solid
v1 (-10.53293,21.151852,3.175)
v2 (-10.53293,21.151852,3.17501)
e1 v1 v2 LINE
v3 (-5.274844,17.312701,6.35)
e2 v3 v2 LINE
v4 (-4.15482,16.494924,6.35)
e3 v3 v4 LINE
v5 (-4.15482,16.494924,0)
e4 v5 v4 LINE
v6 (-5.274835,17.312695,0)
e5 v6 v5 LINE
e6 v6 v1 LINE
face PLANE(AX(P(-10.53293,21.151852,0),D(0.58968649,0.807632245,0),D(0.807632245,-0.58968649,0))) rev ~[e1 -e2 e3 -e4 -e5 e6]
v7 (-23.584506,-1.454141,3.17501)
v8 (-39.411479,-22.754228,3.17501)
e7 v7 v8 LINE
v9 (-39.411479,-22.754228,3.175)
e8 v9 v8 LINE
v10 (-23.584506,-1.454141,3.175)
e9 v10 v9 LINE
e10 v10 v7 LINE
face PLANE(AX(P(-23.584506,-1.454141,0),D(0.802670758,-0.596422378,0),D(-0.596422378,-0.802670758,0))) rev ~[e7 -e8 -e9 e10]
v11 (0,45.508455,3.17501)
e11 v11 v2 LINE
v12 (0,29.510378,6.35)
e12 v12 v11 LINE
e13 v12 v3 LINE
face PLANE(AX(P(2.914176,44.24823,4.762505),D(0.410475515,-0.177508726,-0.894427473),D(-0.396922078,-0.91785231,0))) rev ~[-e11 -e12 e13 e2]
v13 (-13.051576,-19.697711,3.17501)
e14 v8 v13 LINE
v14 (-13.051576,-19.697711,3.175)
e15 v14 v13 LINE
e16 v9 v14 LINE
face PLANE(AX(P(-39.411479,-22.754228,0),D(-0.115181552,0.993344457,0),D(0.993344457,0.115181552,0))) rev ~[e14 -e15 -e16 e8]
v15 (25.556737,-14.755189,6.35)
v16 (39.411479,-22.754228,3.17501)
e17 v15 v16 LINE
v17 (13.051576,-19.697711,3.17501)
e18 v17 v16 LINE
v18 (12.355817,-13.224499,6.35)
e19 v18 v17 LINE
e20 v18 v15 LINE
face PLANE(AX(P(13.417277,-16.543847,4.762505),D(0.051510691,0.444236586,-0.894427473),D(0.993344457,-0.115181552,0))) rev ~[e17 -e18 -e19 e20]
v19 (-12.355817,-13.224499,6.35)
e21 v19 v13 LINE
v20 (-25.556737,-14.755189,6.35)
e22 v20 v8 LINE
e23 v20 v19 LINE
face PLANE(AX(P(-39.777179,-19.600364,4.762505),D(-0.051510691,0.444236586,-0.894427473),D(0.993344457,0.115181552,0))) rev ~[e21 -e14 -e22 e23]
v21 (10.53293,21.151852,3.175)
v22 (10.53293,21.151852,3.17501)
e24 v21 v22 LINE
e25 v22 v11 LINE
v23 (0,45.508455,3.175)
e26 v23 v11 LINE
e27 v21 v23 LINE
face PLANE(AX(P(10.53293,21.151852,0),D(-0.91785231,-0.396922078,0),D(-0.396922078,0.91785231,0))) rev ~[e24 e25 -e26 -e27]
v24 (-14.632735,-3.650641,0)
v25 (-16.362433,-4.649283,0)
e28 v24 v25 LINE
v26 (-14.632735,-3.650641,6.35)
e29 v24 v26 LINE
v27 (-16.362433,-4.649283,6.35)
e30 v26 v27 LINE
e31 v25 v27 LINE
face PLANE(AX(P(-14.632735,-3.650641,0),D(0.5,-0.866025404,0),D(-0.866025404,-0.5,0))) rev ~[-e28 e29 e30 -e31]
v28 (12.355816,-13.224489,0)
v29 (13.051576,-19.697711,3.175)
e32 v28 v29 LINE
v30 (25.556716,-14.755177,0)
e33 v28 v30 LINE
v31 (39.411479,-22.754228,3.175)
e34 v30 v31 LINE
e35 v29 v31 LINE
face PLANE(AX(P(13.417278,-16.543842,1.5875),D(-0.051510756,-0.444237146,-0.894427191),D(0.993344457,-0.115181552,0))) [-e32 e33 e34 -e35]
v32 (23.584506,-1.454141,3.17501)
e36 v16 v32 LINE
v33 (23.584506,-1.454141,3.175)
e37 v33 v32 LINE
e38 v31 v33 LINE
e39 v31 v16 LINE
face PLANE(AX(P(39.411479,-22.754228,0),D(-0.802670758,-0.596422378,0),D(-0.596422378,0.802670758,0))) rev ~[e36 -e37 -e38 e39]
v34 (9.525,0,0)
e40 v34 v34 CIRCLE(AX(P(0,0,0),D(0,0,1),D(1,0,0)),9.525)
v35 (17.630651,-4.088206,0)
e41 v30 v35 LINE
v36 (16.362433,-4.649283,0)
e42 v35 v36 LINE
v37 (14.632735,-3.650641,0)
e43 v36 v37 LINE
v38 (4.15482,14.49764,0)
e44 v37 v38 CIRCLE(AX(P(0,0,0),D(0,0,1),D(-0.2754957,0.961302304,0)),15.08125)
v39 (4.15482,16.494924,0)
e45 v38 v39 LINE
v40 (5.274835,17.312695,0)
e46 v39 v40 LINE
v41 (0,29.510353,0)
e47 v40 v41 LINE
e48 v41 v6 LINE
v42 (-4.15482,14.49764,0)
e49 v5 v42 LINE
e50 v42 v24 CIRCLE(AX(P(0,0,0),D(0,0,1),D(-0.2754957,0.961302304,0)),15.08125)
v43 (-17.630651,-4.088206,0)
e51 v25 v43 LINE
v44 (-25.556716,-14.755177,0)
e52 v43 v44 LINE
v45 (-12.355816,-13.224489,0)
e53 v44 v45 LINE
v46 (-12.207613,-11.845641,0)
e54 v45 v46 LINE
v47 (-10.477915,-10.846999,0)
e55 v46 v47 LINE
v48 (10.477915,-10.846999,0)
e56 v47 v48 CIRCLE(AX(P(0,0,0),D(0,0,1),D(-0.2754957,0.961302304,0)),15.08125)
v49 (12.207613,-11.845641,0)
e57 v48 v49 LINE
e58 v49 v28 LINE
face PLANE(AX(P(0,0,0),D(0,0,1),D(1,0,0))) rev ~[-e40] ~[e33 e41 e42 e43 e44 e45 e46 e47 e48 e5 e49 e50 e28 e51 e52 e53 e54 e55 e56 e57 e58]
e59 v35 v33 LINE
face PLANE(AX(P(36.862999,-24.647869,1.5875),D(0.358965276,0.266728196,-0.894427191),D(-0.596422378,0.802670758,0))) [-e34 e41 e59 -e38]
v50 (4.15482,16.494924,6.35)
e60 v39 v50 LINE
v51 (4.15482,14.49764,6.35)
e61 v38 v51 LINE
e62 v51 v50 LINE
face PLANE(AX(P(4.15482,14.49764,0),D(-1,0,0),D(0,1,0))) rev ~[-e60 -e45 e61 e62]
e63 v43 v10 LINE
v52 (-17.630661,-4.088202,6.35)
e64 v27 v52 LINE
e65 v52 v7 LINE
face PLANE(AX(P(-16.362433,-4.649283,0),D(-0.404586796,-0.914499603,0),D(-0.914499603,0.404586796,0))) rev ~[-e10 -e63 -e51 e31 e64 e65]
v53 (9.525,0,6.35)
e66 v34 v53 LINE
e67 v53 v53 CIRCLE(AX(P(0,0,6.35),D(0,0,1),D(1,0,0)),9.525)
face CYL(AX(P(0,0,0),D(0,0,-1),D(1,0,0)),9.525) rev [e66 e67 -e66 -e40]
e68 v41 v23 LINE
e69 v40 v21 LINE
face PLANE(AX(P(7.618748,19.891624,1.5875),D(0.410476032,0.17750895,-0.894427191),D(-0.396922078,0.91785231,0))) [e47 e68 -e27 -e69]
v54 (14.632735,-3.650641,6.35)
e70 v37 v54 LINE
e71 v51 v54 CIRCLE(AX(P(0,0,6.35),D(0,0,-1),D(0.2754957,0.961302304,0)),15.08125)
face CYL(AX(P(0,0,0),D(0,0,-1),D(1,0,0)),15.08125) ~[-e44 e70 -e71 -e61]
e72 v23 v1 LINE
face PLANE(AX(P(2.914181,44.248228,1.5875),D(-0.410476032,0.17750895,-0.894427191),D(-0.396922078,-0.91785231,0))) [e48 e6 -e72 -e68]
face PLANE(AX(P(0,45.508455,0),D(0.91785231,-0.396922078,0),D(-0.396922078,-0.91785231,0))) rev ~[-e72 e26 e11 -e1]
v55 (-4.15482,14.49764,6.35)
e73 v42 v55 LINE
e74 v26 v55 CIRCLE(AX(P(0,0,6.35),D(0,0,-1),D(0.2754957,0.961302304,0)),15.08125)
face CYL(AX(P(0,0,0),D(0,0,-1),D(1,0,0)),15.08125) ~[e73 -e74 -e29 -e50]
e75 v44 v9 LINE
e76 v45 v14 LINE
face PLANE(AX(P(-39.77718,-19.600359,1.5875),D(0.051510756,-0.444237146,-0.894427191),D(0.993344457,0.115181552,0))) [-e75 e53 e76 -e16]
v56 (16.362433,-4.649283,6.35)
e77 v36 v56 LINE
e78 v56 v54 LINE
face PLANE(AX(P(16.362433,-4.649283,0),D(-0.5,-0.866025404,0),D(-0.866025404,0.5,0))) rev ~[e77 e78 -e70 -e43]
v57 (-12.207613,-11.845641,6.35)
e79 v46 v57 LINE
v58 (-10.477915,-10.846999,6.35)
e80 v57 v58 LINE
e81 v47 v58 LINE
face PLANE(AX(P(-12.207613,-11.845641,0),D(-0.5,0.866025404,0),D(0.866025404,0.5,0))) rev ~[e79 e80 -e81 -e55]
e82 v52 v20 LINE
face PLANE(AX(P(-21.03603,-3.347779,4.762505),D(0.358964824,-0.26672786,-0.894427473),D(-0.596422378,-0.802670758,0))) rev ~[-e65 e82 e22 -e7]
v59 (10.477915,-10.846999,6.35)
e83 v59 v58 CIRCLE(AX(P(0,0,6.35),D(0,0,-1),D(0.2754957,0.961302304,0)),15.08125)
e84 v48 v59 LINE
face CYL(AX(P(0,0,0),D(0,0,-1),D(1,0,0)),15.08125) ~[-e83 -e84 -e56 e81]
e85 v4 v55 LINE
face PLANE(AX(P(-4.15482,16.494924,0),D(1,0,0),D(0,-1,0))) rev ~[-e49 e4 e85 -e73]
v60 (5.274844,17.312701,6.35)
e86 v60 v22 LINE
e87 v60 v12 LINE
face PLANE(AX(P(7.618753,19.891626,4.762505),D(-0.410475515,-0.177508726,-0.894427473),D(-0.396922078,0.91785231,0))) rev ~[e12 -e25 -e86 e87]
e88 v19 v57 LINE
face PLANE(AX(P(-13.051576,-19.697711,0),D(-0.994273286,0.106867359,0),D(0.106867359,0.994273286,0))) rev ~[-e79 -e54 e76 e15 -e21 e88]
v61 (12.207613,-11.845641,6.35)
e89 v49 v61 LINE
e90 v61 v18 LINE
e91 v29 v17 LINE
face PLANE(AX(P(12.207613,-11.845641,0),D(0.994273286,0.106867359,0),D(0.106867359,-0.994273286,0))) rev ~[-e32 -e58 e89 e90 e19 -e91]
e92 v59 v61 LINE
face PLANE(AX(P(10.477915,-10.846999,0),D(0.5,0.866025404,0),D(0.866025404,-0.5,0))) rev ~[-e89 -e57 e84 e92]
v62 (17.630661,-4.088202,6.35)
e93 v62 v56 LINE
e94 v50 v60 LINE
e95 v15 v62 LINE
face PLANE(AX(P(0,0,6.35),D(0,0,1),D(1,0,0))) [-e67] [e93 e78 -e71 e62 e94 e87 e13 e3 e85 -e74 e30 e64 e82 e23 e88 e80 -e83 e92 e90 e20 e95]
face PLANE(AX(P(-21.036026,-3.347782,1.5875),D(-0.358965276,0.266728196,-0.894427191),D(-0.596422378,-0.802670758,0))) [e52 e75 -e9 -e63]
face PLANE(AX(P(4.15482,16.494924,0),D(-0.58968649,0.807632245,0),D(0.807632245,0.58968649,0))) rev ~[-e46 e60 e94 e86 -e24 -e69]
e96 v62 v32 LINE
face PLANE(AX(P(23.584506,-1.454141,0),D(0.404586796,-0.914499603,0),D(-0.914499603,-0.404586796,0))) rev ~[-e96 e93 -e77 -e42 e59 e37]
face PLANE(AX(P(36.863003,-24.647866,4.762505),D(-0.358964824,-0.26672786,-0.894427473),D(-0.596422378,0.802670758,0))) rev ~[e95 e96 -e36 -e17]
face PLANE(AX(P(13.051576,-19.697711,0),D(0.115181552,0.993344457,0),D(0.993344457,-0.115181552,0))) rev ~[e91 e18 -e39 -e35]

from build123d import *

# Parameters (mm, degrees)
F0_R            = 15.08125
F0_R_2          = 9.525
F1_DEPTH        = 6.35
F3_DEPTH        = 6.35
F3_COPIES_COUNT = 3
F4_SIZE2        = 3.175
F4_SIZE         = 6.35
F4_2_SIZE2      = 3.17499
F4_2_SIZE       = 6.34999


# Not quite as in the source:
# - a fillet or chamfer is up to 0.001 mm smaller than in the source, because OpenCascade refuses the exact size
# - a pattern or mirror of a feature is missing from the dataset's text; its kind, count and spacing are read off the source's solid


with BuildPart() as f1:
    # F0 (on Top) → F1 (new body)
    with BuildSketch(Plane.XY):
        Circle(F0_R)
        Circle(F0_R_2, mode=Mode.SUBTRACT)
    extrude(amount=F1_DEPTH)

    # F2 (on Top) → F3 (join, through all)
    with BuildSketch(Plane.XY):
        with BuildLine():
            Line((10.532929562, 21.1518518627), (0, 45.5084554851))
            Line((0, 45.5084554851), (-10.532929562, 21.1518518627))
            Line((-10.532929562, 21.1518518627), (-4.1548195295, 16.4949237317))
            Line((-4.1548195295, 16.4949237317), (-4.1548195295, 14.497640368))
            ThreePointArc((-4.1548195295, 14.497640368), (0, 15.08125), (4.1548195295, 14.497640368))
            Line((4.1548195295, 14.497640368), (4.1548195295, 16.4949237317))
            Line((4.1548195295, 16.4949237317), (10.532929562, 21.1518518627))
        make_face()
    f3 = extrude(amount=F3_DEPTH)

    # F3_copies: F3 ×3 about axis
    f3_copies_axis = Axis((0, 0, 0), (0, 0, 1))
    for i in range(1, F3_COPIES_COUNT):
        add(f3.rotate(f3_copies_axis, i * 360 / F3_COPIES_COUNT))

    # F4
    f4_edges = [f1.edges().sort_by_distance(p)[0] for p in [
        (-5.266465, 33.330154, 0),
        (5.266465, 33.330154, 0),
        (-31.497992, -12.104185, 0),
        (-26.231527, -21.225969, 0),
        (26.231527, -21.225969, 0),
        (31.497992, -12.104185, 0),
    ]]
    f4_side = f1.faces().sort_by_distance((3.11209, 15.496282, 0))[0]
    chamfer(f4_edges, length=F4_SIZE, length2=F4_SIZE2, reference=f4_side)

    # F4#2 (size 6.35 and 3.175 in the source; OpenCascade refuses exactly that, so slightly less here)
    f4_2_edges = [f1.edges().sort_by_distance(p)[0] for p in [
        (-5.266465, 33.330154, 6.35),
        (5.266465, 33.330154, 6.35),
        (-31.497992, -12.104185, 6.35),
        (-26.231527, -21.225969, 6.35),
        (26.231527, -21.225969, 6.35),
        (31.497992, -12.104185, 6.35),
    ]]
    f4_2_side = f1.faces().sort_by_distance((12.157715, 7.01926, 6.35))[0]
    chamfer(f4_2_edges, length=F4_2_SIZE, length2=F4_2_SIZE2, reference=f4_2_side)


solid = f1.part
